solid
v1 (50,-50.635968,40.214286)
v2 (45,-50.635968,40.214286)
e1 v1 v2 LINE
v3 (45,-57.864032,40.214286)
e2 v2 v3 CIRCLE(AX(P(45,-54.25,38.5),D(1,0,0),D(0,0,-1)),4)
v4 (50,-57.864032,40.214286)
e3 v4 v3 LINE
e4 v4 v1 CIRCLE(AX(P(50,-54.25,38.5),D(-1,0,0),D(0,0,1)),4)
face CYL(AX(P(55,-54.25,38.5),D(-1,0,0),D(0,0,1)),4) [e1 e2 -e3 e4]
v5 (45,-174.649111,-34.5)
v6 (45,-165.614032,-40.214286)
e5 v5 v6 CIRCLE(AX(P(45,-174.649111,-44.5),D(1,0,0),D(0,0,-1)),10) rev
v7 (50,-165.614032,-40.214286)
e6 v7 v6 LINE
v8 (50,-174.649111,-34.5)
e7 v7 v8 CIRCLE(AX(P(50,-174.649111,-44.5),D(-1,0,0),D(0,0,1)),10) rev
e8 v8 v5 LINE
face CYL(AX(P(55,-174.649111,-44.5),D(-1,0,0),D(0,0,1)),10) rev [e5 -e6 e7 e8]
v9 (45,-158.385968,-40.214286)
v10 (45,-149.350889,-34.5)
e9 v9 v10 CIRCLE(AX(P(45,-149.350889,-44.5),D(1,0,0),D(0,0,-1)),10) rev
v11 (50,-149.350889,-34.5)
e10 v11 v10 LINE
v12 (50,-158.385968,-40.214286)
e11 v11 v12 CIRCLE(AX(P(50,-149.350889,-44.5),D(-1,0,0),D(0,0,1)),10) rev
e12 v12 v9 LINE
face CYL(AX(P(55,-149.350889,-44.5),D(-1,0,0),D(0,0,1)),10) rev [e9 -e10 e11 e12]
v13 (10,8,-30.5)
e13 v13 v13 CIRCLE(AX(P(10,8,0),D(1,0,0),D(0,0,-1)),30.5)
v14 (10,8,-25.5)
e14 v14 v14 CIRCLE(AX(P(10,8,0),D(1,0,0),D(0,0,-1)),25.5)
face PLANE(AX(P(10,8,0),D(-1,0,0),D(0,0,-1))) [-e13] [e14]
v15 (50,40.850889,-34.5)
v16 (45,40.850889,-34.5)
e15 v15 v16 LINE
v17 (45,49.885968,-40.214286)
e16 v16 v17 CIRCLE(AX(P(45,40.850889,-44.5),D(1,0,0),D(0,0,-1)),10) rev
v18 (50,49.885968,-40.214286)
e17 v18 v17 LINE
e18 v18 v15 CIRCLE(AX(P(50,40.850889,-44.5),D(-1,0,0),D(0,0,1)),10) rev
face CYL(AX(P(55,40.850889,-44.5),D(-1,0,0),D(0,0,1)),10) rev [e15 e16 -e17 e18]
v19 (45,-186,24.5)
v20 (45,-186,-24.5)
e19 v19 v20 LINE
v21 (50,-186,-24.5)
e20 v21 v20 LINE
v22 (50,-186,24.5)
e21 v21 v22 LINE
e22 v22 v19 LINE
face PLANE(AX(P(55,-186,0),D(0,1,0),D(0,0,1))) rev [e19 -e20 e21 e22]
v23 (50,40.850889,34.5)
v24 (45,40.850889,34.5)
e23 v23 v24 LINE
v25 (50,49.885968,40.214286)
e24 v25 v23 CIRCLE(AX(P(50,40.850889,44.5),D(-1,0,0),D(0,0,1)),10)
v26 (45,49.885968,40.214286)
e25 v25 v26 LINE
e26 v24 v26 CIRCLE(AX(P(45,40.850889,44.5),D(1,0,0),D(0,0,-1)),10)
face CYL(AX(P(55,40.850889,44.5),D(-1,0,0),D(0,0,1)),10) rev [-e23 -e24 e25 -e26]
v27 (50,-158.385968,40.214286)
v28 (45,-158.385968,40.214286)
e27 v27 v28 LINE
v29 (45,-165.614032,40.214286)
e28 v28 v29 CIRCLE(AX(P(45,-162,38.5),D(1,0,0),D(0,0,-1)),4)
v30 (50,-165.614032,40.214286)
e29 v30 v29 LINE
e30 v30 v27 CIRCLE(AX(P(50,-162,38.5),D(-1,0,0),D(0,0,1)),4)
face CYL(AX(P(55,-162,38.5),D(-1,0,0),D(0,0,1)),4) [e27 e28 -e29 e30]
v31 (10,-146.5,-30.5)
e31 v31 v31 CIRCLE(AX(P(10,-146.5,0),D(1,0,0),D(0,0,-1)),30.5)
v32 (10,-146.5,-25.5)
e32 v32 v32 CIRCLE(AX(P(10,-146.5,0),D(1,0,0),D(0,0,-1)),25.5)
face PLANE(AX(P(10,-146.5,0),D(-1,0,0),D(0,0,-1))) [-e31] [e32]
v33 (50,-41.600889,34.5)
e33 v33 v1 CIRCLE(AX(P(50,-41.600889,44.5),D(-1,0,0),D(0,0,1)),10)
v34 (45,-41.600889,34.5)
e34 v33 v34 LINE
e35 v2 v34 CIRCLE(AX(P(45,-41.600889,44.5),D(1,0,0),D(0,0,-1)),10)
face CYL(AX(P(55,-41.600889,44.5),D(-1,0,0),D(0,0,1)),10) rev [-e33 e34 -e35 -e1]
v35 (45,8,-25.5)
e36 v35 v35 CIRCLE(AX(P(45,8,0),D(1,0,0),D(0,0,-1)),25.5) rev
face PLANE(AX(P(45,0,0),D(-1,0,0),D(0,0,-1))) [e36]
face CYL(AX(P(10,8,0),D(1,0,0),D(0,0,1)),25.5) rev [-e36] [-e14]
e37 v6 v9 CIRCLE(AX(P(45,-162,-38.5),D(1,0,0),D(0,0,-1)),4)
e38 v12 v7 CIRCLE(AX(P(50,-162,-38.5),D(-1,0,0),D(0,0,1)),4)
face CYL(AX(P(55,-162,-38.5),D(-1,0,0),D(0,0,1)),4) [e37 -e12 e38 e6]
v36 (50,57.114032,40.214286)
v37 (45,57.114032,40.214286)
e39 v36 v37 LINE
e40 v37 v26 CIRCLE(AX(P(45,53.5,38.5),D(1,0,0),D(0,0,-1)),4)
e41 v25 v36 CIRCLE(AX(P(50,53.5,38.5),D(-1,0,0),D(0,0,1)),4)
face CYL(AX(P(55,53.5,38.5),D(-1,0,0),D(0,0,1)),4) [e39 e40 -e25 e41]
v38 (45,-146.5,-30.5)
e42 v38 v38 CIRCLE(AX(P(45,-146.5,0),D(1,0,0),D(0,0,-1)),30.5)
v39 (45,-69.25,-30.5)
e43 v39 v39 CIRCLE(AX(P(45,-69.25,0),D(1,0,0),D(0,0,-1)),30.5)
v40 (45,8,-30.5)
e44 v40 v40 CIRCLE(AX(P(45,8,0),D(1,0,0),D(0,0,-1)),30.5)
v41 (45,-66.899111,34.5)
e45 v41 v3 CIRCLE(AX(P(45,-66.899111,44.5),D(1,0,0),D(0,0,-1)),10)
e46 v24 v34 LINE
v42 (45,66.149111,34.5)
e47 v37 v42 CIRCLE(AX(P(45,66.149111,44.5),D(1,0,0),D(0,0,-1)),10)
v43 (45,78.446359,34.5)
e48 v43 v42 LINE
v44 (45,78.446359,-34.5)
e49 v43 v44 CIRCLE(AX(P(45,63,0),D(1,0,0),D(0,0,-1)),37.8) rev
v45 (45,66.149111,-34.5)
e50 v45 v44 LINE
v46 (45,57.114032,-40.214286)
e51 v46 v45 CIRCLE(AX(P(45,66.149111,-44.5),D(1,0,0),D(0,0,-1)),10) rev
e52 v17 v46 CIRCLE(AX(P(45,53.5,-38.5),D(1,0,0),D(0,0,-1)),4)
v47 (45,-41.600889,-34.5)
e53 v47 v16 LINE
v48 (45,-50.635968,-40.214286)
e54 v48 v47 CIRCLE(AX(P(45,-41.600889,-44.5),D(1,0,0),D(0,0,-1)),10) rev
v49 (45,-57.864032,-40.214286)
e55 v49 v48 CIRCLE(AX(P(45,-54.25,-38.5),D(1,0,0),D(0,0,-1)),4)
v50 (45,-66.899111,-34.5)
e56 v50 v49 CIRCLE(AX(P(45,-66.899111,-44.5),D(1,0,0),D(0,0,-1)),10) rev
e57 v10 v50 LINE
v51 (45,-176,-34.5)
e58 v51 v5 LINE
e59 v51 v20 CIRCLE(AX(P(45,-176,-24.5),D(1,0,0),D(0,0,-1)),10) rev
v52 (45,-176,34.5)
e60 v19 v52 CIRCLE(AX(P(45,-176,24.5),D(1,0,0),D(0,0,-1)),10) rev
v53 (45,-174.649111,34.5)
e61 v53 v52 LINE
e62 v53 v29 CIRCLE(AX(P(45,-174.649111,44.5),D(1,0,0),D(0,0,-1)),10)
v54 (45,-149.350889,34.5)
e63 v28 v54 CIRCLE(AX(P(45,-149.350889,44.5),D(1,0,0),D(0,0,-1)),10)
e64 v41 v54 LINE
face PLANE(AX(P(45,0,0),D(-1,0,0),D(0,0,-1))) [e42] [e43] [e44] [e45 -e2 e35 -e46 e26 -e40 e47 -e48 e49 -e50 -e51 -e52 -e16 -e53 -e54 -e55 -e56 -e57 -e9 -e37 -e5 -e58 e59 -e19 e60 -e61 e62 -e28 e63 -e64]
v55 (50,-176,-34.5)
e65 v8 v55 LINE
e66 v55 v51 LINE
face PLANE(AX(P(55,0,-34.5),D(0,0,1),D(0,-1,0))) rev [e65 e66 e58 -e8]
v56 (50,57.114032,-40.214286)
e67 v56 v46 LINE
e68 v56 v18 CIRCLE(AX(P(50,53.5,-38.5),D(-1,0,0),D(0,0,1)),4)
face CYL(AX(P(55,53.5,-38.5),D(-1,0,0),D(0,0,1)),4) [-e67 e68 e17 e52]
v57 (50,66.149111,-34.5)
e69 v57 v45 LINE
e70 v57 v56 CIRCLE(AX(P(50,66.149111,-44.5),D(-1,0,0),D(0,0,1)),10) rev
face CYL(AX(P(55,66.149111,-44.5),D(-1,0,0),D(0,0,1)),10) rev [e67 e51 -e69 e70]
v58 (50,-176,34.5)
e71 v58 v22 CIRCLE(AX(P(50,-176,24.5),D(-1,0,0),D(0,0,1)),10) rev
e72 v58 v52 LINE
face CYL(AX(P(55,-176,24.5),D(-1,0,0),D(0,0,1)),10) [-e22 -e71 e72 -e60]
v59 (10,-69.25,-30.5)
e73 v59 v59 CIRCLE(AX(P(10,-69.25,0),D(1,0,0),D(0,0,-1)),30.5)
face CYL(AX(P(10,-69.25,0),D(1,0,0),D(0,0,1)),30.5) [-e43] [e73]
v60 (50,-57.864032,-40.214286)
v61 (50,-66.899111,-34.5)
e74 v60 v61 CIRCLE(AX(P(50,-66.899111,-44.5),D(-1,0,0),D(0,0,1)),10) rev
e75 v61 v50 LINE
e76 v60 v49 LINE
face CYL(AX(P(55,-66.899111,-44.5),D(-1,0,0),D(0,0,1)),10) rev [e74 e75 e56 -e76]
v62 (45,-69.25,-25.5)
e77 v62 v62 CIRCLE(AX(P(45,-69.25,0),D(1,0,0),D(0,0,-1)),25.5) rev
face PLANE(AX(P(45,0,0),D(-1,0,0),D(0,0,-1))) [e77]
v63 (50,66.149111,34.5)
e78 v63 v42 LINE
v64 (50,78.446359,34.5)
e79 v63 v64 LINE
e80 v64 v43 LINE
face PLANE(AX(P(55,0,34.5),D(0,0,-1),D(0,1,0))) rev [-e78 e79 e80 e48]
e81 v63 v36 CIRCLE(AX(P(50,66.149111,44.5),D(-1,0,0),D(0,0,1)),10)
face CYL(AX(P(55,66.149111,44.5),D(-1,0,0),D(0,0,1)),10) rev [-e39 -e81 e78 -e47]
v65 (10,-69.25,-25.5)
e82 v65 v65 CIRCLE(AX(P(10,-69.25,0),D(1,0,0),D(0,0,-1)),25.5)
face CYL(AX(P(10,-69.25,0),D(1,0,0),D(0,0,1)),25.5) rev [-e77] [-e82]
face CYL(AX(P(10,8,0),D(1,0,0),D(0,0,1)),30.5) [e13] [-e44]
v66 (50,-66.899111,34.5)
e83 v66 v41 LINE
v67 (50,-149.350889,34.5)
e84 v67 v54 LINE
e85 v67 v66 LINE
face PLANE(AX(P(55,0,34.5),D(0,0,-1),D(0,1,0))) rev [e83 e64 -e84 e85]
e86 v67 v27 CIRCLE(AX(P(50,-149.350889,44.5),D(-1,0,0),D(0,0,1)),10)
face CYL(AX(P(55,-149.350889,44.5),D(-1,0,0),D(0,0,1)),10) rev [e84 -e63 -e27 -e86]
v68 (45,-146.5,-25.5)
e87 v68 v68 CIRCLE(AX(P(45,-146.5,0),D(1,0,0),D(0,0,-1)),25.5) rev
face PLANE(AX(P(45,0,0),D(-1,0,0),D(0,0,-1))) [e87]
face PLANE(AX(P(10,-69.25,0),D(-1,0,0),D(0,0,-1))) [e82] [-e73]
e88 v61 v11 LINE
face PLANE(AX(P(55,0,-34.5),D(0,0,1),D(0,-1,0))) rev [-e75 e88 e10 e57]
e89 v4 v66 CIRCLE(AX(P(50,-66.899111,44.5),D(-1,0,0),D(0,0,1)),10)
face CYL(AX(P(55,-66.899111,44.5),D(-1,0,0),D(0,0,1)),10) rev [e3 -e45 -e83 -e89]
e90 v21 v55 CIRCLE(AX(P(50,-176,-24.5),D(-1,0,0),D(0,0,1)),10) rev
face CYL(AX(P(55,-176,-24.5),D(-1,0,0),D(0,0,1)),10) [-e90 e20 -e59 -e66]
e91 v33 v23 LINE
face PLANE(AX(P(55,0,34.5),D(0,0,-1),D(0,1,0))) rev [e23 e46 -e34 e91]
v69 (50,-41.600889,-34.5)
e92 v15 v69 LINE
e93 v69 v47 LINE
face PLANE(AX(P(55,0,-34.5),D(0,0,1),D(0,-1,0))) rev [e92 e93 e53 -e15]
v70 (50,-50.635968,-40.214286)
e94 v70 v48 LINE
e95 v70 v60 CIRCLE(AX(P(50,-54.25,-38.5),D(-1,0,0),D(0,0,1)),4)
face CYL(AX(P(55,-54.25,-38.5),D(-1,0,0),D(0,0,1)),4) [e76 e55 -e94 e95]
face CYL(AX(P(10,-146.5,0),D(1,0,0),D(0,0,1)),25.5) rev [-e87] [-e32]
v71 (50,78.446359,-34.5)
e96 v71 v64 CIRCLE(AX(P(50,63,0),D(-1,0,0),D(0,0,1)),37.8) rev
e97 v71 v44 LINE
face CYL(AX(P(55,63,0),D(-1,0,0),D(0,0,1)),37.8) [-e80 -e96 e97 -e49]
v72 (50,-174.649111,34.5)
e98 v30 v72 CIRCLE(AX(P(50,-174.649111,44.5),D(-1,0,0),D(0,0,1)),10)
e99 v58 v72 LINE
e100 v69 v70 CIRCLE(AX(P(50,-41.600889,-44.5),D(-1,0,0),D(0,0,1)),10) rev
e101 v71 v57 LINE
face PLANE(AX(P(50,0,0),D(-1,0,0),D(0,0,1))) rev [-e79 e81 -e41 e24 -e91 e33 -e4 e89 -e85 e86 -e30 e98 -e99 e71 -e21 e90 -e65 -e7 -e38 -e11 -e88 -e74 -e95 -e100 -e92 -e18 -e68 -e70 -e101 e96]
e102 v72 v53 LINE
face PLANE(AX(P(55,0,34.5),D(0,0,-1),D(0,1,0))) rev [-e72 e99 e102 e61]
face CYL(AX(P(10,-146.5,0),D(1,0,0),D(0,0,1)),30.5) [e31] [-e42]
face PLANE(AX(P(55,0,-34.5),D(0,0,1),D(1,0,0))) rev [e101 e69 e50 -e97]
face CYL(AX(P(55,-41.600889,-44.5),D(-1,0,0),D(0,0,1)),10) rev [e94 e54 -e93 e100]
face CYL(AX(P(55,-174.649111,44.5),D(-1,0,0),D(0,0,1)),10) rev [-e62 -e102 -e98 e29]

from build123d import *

# Parameters (mm, degrees)
BOSS_EXTRUDE2_START = 50
BOSS_EXTRUDE2_DEPTH = 5
BOSS_EXTRUDE3_START = 55
SKETCH3_R           = 30.5
SKETCH3_R_2         = 25.5
BOSS_EXTRUDE3_DEPTH = 35


# Read off the part's stored shape, not the designer's step: Intersect2
with BuildPart() as part:
    # Sketch2<8> → Boss-Extrude2 (new body)
    with BuildSketch(Plane(origin=(0, 0, 0), x_dir=(0, 0, -1), z_dir=(1, 0, 0)).offset(BOSS_EXTRUDE2_START)):
        with BuildLine():
            Line((-34.5, 78.446358794), (-34.5, 66.149110641))
            ThreePointArc((-34.5, 66.149110641), (-36.048457453, 60.803885802), (-40.214285714, 57.114031612))
            ThreePointArc((-40.214285714, 57.114031612), (-42.5, 53.5), (-40.214285714, 49.885968388))
            ThreePointArc((-40.214285714, 49.885968388), (-36.048457453, 46.196114198), (-34.5, 40.850889359))
            Line((-34.5, 40.850889359), (-34.5, -41.600889359))
            ThreePointArc((-34.5, -41.600889359), (-36.048457453, -46.946114198), (-40.214285714, -50.635968388))
            ThreePointArc((-40.214285714, -50.635968388), (-42.5, -54.25), (-40.214285714, -57.864031612))
            ThreePointArc((-40.214285714, -57.864031612), (-36.048457453, -61.553885802), (-34.5, -66.899110641))
            Line((-34.5, -66.899110641), (-34.5, -149.350889359))
            ThreePointArc((-34.5, -149.350889359), (-36.048457453, -154.696114198), (-40.214285714, -158.385968388))
            ThreePointArc((-40.214285714, -158.385968388), (-42.5, -162), (-40.214285714, -165.614031612))
            ThreePointArc((-40.214285714, -165.614031612), (-36.048457453, -169.303885802), (-34.5, -174.649110641))
            Line((-34.5, -174.649110641), (-34.5, -176))
            ThreePointArc((-34.5, -176), (-31.571067812, -183.071067812), (-24.5, -186))
            Line((-24.5, -186), (24.5, -186))
            ThreePointArc((24.5, -186), (31.571067812, -183.071067812), (34.5, -176))
            Line((34.5, -176), (34.5, -174.649110641))
            ThreePointArc((34.5, -174.649110641), (36.048457453, -169.303885802), (40.214285714, -165.614031612))
            ThreePointArc((40.214285714, -165.614031612), (42.5, -162), (40.214285714, -158.385968388))
            ThreePointArc((40.214285714, -158.385968388), (36.048457453, -154.696114198), (34.5, -149.350889359))
            Line((34.5, -149.350889359), (34.5, -66.899110641))
            ThreePointArc((34.5, -66.899110641), (36.048457453, -61.553885802), (40.214285714, -57.864031612))
            ThreePointArc((40.214285714, -57.864031612), (42.5, -54.25), (40.214285714, -50.635968388))
            ThreePointArc((40.214285714, -50.635968388), (36.048457453, -46.946114198), (34.5, -41.600889359))
            Line((34.5, -41.600889359), (34.5, 40.850889359))
            ThreePointArc((34.5, 40.850889359), (36.048457453, 46.196114198), (40.214285714, 49.885968388))
            ThreePointArc((40.214285714, 49.885968388), (42.5, 53.5), (40.214285714, 57.114031612))
            ThreePointArc((40.214285714, 57.114031612), (36.048457453, 60.803885802), (34.5, 66.149110641))
            Line((34.5, 66.149110641), (34.5, 78.446358794))
            ThreePointArc((34.5, 78.446358794), (0, 100.8), (-34.5, 78.446358794))
        make_face()
    boss_extrude2 = extrude(amount=BOSS_EXTRUDE2_DEPTH)

    # Sketch3 → Boss-Extrude3 (add)
    # profile 1 of 3: a face of its own
    with BuildSketch(Plane(origin=(0, 0, 0), x_dir=(0, 0, -1), z_dir=(1, 0, 0)).offset(BOSS_EXTRUDE3_START)):
        with Locations((0, -146.5)):
            Circle(SKETCH3_R)
        with Locations((0, -146.5)):
            Circle(SKETCH3_R_2, mode=Mode.SUBTRACT)
    # profile 2 of 3: a face of its own
    with BuildSketch(Plane(origin=(0, 0, 0), x_dir=(0, 0, -1), z_dir=(1, 0, 0)).offset(BOSS_EXTRUDE3_START)):
        with Locations((0, -69.25)):
            Circle(SKETCH3_R)
        with Locations((0, -69.25)):
            Circle(SKETCH3_R_2, mode=Mode.SUBTRACT)
    # profile 3 of 3: a face of its own
    with BuildSketch(Plane(origin=(0, 0, 0), x_dir=(0, 0, -1), z_dir=(1, 0, 0)).offset(BOSS_EXTRUDE3_START)):
        with Locations((0, 8)):
            Circle(SKETCH3_R)
        with Locations((0, 8)):
            Circle(SKETCH3_R_2, mode=Mode.SUBTRACT)
    boss_extrude3 = extrude(amount=BOSS_EXTRUDE3_DEPTH)

    # Mirror3: Boss-Extrude2, Boss-Extrude3 across plane
    add(boss_extrude2.mirror(Plane.ZY.offset(-50)))
    add(boss_extrude3.mirror(Plane.ZY.offset(-50)))


with BuildPart() as body_2:
    # Intersect2: the piece on the far side of the plane
    add(part.part)
    split(bisect_by=Plane.YZ.offset(50), keep=Keep.BOTTOM)


with BuildPart() as part_1:
    add(part.part)

    # Intersect2
    split(bisect_by=Plane.YZ.offset(50), keep=Keep.TOP)


solid = body_2.part
